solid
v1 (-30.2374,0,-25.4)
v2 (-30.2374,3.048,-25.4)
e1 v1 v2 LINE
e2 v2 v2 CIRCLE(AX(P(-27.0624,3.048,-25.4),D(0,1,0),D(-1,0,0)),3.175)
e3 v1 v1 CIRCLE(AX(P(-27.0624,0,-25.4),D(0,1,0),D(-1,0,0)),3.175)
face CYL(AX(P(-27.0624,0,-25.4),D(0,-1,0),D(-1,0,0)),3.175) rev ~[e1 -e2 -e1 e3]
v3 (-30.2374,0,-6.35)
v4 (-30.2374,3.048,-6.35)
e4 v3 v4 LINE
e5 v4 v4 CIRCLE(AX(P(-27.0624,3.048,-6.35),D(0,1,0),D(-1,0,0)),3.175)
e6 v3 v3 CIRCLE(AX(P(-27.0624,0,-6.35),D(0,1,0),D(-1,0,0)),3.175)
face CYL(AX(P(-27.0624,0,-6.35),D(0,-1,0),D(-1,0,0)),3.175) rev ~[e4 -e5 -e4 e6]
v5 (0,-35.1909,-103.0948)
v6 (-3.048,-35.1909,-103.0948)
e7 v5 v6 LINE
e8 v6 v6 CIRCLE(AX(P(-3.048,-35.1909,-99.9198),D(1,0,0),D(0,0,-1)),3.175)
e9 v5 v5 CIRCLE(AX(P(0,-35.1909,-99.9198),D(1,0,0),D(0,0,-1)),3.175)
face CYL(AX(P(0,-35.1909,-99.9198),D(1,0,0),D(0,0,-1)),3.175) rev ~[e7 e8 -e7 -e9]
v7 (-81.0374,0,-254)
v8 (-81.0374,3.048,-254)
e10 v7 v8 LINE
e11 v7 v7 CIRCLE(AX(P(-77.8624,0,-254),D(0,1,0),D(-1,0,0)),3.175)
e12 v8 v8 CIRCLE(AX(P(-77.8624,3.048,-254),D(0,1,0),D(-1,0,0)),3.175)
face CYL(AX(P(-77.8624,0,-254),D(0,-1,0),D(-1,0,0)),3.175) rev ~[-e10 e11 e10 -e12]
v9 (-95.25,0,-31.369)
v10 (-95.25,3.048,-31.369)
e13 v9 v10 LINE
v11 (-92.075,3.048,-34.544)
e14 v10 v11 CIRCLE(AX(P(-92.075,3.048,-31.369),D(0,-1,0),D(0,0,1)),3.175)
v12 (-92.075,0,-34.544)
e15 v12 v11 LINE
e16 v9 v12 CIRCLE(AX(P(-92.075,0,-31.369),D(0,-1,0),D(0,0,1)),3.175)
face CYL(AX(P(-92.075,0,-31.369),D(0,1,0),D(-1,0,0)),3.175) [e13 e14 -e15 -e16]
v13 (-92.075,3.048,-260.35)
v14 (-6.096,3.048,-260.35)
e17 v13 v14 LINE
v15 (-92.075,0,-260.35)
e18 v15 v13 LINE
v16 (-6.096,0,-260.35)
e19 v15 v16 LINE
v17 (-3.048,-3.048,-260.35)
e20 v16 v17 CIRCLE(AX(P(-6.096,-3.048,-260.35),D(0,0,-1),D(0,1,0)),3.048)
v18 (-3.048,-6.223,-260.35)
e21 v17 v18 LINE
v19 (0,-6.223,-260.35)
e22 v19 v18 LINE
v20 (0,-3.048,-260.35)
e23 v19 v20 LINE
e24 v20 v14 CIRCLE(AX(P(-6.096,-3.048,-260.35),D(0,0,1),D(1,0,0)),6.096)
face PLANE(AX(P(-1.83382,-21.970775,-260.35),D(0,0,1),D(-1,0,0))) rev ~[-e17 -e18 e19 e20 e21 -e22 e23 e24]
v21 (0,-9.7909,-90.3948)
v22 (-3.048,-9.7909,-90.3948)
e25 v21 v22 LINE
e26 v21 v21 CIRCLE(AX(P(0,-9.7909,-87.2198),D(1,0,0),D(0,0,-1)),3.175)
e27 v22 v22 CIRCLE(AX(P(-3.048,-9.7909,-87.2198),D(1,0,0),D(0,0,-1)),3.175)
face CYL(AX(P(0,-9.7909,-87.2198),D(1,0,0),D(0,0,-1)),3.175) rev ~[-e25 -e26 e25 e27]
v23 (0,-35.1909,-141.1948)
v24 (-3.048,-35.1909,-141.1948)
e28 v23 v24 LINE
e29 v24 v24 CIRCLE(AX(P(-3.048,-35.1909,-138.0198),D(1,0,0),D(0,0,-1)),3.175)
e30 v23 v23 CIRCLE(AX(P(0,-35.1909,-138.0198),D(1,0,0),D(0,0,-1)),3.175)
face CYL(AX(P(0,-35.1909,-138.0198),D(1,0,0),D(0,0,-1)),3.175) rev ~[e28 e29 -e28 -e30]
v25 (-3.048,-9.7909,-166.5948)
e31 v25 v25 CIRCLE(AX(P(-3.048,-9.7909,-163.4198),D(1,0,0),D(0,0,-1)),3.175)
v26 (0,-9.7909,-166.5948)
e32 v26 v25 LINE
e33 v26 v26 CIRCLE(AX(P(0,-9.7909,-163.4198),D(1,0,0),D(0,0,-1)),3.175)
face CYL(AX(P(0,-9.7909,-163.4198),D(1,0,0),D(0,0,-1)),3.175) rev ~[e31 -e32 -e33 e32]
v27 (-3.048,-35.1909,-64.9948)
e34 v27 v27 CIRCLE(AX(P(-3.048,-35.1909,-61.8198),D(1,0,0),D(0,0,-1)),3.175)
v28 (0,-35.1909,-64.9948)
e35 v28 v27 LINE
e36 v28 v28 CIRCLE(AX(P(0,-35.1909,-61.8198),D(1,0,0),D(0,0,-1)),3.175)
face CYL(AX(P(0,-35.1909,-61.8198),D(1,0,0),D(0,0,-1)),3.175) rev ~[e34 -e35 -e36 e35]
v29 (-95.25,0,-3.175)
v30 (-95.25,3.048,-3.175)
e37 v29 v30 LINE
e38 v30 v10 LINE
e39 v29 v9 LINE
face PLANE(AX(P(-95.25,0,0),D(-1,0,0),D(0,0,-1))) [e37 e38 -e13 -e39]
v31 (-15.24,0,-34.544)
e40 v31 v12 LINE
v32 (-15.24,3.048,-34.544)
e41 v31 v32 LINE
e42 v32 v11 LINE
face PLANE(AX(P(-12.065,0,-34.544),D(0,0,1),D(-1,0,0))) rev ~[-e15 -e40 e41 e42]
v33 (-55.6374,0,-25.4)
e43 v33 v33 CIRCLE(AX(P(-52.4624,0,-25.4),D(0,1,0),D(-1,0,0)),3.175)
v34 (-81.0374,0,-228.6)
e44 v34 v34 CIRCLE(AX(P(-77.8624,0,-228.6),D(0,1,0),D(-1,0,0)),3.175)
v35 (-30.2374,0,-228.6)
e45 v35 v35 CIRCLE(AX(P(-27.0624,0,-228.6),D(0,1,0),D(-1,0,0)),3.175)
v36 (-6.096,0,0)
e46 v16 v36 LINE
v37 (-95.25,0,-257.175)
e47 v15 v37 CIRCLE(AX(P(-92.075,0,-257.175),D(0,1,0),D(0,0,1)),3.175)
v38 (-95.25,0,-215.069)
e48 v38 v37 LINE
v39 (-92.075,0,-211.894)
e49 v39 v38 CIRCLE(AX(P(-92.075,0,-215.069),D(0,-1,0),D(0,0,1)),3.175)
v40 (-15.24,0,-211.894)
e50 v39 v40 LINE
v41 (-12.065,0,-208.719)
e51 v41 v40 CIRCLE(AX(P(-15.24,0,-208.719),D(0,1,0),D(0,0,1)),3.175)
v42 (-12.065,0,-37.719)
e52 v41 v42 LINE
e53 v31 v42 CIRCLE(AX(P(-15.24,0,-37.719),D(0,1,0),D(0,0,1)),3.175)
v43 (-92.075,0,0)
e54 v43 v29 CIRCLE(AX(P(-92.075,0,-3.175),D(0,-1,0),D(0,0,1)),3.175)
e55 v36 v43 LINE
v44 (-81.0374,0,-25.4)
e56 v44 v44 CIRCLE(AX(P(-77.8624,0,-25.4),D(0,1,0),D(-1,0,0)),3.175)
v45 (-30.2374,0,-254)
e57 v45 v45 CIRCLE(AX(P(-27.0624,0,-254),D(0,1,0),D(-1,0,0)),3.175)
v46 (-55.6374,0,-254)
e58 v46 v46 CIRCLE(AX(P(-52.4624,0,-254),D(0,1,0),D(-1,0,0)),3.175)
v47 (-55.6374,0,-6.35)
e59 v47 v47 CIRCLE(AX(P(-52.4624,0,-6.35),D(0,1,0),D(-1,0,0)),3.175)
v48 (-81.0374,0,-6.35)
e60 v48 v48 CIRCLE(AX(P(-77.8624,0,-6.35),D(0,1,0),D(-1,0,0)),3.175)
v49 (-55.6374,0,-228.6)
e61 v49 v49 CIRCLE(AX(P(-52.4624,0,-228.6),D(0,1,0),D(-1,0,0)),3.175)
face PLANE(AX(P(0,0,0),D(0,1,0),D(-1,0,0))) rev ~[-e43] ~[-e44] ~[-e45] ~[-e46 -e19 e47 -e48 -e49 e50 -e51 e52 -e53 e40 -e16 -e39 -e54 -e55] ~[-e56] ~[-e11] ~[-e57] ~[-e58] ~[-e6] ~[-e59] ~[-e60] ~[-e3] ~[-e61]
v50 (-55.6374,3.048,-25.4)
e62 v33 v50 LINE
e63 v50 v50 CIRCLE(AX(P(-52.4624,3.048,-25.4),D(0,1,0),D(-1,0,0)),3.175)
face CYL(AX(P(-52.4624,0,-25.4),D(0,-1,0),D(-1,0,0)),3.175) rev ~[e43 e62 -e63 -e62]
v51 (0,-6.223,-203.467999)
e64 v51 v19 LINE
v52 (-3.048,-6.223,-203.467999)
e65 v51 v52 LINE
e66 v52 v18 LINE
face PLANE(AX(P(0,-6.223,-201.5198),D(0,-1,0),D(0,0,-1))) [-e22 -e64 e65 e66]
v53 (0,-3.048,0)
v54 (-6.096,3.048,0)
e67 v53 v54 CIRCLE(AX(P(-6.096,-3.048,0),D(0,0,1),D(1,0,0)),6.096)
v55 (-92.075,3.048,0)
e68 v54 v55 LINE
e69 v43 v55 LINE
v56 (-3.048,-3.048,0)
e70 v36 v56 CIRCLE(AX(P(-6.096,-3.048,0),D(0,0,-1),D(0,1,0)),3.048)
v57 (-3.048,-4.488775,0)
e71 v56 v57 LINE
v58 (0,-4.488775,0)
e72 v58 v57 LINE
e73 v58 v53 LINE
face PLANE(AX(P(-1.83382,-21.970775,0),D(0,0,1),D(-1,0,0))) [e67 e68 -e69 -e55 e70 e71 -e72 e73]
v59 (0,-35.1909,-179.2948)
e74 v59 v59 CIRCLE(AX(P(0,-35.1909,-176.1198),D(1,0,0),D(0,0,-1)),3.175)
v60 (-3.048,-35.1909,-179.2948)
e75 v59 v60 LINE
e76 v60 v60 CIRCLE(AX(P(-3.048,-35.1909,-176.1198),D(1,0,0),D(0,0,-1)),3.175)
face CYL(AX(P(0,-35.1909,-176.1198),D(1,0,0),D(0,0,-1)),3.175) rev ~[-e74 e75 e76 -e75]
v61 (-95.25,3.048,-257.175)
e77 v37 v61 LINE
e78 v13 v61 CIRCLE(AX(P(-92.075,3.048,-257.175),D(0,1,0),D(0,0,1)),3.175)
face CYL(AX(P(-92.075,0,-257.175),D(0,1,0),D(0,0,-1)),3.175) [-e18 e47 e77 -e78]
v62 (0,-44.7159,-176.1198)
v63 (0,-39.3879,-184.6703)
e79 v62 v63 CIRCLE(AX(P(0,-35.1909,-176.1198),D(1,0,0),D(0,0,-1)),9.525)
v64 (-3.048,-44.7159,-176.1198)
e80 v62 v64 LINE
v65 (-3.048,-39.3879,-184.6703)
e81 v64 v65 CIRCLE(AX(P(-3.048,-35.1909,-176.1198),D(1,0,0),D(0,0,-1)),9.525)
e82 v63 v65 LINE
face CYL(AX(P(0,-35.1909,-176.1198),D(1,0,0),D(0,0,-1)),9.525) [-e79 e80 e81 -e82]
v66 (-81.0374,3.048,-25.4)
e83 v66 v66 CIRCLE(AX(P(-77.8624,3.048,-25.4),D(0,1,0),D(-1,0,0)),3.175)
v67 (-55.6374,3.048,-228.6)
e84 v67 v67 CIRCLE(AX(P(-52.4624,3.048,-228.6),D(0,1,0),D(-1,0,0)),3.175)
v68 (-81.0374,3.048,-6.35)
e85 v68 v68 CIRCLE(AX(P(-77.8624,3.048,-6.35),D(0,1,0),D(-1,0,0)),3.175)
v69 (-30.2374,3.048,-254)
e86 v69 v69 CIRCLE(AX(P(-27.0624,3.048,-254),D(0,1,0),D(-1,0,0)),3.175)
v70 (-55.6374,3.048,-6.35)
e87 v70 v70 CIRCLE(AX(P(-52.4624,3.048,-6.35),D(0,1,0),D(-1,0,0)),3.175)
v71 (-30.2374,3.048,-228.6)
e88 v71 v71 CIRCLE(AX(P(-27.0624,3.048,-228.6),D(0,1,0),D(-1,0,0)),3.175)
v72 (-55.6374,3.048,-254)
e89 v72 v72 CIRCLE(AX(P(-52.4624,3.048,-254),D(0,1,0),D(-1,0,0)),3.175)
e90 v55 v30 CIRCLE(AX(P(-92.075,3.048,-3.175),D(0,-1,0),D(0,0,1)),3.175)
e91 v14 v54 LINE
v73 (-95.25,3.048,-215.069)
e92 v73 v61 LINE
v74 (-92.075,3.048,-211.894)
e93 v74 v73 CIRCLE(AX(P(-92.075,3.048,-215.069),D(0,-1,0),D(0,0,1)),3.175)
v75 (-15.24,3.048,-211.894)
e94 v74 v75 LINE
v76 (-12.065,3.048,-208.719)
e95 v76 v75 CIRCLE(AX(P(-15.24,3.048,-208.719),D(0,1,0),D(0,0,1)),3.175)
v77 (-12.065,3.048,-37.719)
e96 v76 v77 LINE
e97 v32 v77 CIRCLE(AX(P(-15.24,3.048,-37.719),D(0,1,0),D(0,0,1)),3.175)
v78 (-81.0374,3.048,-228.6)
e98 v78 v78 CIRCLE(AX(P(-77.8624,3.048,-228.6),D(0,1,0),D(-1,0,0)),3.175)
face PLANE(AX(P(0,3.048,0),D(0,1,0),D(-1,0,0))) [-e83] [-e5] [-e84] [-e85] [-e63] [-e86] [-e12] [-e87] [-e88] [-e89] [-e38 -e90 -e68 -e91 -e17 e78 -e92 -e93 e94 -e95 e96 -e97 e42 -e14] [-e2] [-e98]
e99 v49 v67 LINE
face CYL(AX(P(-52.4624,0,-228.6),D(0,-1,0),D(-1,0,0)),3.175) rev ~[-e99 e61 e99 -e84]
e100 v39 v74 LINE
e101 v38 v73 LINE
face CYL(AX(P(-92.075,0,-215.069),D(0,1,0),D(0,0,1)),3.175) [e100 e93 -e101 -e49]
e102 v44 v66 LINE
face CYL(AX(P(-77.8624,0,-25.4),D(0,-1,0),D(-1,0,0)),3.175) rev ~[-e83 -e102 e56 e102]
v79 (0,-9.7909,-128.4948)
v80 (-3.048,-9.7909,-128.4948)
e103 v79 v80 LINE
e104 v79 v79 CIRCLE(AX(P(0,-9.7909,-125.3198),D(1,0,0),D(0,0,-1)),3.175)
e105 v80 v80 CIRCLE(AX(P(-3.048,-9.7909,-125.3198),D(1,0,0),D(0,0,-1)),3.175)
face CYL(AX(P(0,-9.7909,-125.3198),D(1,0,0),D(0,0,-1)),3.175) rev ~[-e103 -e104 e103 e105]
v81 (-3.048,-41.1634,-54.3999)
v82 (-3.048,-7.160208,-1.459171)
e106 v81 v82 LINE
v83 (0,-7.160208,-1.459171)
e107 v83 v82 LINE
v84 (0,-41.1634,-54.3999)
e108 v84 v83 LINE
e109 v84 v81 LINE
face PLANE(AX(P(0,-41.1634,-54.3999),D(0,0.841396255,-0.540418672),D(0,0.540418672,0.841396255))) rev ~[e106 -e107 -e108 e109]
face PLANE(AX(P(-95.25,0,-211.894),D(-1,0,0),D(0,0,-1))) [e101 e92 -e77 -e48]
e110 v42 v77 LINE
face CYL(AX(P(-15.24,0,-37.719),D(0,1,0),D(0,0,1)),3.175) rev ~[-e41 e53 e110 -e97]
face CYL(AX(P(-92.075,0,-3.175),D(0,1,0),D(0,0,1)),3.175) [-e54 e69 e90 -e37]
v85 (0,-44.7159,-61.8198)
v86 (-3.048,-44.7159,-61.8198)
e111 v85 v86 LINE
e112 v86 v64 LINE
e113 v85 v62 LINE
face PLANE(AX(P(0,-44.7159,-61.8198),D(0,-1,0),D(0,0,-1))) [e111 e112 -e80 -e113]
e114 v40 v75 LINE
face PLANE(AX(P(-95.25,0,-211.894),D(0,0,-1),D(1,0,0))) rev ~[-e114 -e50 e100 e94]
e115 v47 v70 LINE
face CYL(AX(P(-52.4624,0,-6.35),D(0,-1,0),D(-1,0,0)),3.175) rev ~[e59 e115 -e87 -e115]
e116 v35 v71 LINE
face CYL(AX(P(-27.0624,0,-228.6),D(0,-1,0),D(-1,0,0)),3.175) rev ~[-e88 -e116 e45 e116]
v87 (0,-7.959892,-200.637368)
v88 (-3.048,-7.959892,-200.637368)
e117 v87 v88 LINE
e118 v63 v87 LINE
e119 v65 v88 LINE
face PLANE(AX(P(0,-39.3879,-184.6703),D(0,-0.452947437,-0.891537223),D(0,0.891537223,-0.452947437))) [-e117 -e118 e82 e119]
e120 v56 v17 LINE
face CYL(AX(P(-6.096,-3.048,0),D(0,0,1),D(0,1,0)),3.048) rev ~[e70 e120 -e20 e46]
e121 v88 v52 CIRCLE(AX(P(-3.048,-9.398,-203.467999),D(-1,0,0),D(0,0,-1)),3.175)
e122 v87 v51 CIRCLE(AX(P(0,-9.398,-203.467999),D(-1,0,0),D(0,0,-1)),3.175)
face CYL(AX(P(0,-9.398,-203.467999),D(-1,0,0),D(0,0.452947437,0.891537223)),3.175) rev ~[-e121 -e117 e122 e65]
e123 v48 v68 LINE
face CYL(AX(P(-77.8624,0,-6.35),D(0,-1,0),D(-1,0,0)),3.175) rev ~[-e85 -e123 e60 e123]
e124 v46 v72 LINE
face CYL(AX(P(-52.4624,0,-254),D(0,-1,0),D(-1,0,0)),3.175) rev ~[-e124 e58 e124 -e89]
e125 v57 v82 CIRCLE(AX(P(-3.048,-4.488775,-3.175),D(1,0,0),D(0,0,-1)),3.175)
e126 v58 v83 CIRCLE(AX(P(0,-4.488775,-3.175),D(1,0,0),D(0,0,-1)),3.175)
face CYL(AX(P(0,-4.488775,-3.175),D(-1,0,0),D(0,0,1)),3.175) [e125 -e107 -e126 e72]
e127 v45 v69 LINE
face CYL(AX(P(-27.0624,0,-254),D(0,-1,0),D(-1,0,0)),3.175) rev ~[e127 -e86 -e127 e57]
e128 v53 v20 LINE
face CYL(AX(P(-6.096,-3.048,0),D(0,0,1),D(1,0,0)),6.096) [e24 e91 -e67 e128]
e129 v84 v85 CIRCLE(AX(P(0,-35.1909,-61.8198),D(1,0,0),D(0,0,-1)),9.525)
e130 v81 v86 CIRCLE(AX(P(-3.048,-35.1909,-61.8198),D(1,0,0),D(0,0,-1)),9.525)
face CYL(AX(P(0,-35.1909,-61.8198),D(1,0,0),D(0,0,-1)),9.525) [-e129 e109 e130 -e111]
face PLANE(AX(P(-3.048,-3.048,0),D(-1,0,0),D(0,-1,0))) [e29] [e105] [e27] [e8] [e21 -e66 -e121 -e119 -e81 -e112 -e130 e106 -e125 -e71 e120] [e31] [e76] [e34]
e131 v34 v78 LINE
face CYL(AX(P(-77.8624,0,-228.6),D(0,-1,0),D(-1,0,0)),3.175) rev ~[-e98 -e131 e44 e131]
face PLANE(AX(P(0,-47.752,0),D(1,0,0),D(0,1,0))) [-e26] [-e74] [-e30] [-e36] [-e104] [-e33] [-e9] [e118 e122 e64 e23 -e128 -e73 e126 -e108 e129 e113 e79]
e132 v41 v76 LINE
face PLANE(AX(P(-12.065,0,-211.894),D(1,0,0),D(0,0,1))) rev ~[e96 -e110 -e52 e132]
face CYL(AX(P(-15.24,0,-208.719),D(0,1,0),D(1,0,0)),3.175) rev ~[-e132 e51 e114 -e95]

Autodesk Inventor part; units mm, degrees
ref_plane "YZ Plane" through (0, 0, 0) normal (1, 0, 0) x (0, 1, 0)
ref_plane "XZ Plane" through (0, 0, 0) normal (0, 1, 0) x (-1, 0, 0)
ref_plane "XY Plane" through (0, 0, 0) normal (0, 0, 1) x (1, 0, 0)
sketch "Sketch1" plane through (0, 0, 0) normal (0, 1, 0) x (-1, 0, 0)
  line L0 (0, 0) -> (95.25, 0)
  line L1 (95.25, 0) -> (95.25, -260.35)
  line L2 (95.25, -260.35) -> (0, -260.35)
  line L3 (0, -260.35) -> (0, 0)
  circle A0 centre (77.8624, -6.35) radius 3.175
  circle A1 centre (77.8624, -25.4) radius 3.175
  circle A2 centre (52.4624, -6.35) radius 3.175
  circle A3 centre (52.4624, -25.4) radius 3.175
  circle A4 centre (27.0624, -6.35) radius 3.175
  circle A5 centre (27.0624, -25.4) radius 3.175
  circle A6 centre (77.8624, -228.6) radius 3.175
  circle A7 centre (77.8624, -254) radius 3.175
  circle A8 centre (52.4624, -228.6) radius 3.175
  circle A9 centre (52.4624, -254) radius 3.175
  circle A10 centre (27.0624, -228.6) radius 3.175
  circle A11 centre (27.0624, -254) radius 3.175
  line L4 (101.24, -208.719) -> (15.24, -208.719) construction
  line L5 (15.24, -208.719) -> (15.24, -37.719) construction
  line L6 (15.24, -37.719) -> (101.24, -37.719) construction
  line L7 (101.24, -37.719) -> (101.24, -208.719) construction
  line L8 (95.25, -211.894) -> (12.065, -211.894)
  line L9 (12.065, -211.894) -> (12.065, -34.544)
  line L10 (12.065, -34.544) -> (95.25, -34.544)
  dimension "d0" = 95.25
  dimension "d2" = 6.35
  dimension "d3" = 6.35
  dimension "d4" = 17.3876
  dimension "d7" = 19.05
  dimension "d10" = 25.4
  dimension "d15" = 25.4
  dimension "d18" = 25.4
  dimension "d21" = 222.25
  dimension "d22" = 6.35
  dimension "d54" = 86
  dimension "d55" = 177.35
  dimension "d56" = 171
  dimension "d57" = 3.175
  dimension "d58" = 34.544
  dimension "d59" = 3.175
  dimension "d60" = 12.065
extrude "Plate1" add sketch "Sketch1" along normal blind 3.048 contours L0 L1 L10 L9 L8 L2 L3
sketch "Sketch2" plane through (-3.048, 3.048, 0) normal (1, 0, 0) x (0, 1, 0)
  line L0 (0, -260.35) -> (0, 0)
  line L1 (0, 0) -> (-50.8, 0)
  line L2 (-50.8, 0) -> (-50.8, -260.35)
  line L3 (-50.8, -260.35) -> (0, -260.35)
edge flange "Flange1" height 50.8 angle 90 thickness 3.048 bend radius 3.048 thickness toward (1, 0, 0) relief tear relief width 3.048 relief depth 1.524 edges at (0, 0, -130.175) wall of the first edge with corners at (-3.048, 3.048, -260.35) (-3.048, 3.048, 0) (-3.048, -47.752, 0) (-3.048, -47.752, -260.35)
bend "Bend1"
corner "Corner1"
sketch "Sketch3" plane through (0, -47.752, 0) normal (1, 0, 0) x (0, 0, -1)
  circle A0 centre (87.2198, 37.9611) radius 3.175
  circle A1 centre (61.8198, 12.5611) radius 3.175
  line L0 (0, 0) -> (0, 44.704) projected
  line L1 (260.35, 0) -> (0, 0) projected
  circle A2 centre (99.9198, 12.5611) radius 3.175
  circle A3 centre (138.0198, 12.5611) radius 3.175
  circle A4 centre (176.1198, 12.5611) radius 3.175
  circle A5 centre (125.3198, 37.9611) radius 3.175
  circle A6 centre (163.4198, 37.9611) radius 3.175
  circle A7 centre (61.8198, 12.5611) radius 9.525
  circle A8 centre (176.1198, 12.5611) radius 9.525
  line L2 (61.8198, 3.0361) -> (176.1198, 3.0361)
  line L3 (0, 44.704) -> (260.35, 44.704) projected
  line L4 (260.35, 44.704) -> (260.35, 0) projected
  line L5 (54.3999, 6.5886) -> (0, 41.529)
  line L6 (184.6703, 8.3641) -> (201.5198, 41.529)
  line L7 (201.5198, 41.529) -> (260.35, 41.529)
  point P0 (0, 47.752)
  point P1 (178.7879, 44.704)
  dimension "d34" = 6.35
  dimension "d35" = 25.4
  dimension "d36" = 25.4
  dimension "d37" = 61.8198
  dimension "d40" = 38.1
  dimension "d47" = 38.1
  dimension "d61" = 6.35
  dimension "d62" = 6.35
  dimension "d64" = 3.175
  dimension "d65" = 3.175
  dimension "d66" = 25.4
extrude "Cut1" cut sketch "Sketch3" against normal blind 3.048 contours A0 | A1 | L0 L5 A7 L2 A8 L6 L7 L4 L1 | A2 | A3 | A4 | A5 | A6
fillet "Fillet1" radius 3.175 8 edges at (-95.25, 1.524, 0) (-95.25, 1.524, -34.544) (-12.065, 1.524, -34.544) (-95.25, 1.524, -211.894) (-12.065, 1.524, -211.894) (-95.25, 1.524, -260.35) (-1.524, -6.223, -201.5198) (-1.524, -6.223, 0)
equation "\"d65\" = d64"
equation "\"d52\" = Thickness"
equation "\"d23\" = Thickness"
equation "\"d24\" = BendReliefWidth"
equation "\"d25\" = BendReliefDepth"
equation "\"d26\" = MinimumRemnant"
equation "\"d27\" = TransitionRadius"
equation "\"d30\" = BendRadius"
equation "\"d31\" = CornerReliefSize"
equation "\"d32\" = GapSize"
equation "\"d33\" = JacobiRadiusSize"
equation "\"BendRadius\" = Thickness"
equation "\"BendReliefWidth\" = Thickness"
equation "\"BendReliefDepth\" = 0.5 * Thickness"
equation "\"CornerReliefSize\" = 4 * Thickness"
equation "\"MinimumRemnant\" = 2 * Thickness"
equation "\"TransitionRadius\" = BendRadius"
equation "\"JacobiRadiusSize\" = BendRadius"
equation "\"GapSize\" = Thickness"
equation "\"Thickness\" = 3.048"
properties part number "MainDriveMotorToPlateConnector"
